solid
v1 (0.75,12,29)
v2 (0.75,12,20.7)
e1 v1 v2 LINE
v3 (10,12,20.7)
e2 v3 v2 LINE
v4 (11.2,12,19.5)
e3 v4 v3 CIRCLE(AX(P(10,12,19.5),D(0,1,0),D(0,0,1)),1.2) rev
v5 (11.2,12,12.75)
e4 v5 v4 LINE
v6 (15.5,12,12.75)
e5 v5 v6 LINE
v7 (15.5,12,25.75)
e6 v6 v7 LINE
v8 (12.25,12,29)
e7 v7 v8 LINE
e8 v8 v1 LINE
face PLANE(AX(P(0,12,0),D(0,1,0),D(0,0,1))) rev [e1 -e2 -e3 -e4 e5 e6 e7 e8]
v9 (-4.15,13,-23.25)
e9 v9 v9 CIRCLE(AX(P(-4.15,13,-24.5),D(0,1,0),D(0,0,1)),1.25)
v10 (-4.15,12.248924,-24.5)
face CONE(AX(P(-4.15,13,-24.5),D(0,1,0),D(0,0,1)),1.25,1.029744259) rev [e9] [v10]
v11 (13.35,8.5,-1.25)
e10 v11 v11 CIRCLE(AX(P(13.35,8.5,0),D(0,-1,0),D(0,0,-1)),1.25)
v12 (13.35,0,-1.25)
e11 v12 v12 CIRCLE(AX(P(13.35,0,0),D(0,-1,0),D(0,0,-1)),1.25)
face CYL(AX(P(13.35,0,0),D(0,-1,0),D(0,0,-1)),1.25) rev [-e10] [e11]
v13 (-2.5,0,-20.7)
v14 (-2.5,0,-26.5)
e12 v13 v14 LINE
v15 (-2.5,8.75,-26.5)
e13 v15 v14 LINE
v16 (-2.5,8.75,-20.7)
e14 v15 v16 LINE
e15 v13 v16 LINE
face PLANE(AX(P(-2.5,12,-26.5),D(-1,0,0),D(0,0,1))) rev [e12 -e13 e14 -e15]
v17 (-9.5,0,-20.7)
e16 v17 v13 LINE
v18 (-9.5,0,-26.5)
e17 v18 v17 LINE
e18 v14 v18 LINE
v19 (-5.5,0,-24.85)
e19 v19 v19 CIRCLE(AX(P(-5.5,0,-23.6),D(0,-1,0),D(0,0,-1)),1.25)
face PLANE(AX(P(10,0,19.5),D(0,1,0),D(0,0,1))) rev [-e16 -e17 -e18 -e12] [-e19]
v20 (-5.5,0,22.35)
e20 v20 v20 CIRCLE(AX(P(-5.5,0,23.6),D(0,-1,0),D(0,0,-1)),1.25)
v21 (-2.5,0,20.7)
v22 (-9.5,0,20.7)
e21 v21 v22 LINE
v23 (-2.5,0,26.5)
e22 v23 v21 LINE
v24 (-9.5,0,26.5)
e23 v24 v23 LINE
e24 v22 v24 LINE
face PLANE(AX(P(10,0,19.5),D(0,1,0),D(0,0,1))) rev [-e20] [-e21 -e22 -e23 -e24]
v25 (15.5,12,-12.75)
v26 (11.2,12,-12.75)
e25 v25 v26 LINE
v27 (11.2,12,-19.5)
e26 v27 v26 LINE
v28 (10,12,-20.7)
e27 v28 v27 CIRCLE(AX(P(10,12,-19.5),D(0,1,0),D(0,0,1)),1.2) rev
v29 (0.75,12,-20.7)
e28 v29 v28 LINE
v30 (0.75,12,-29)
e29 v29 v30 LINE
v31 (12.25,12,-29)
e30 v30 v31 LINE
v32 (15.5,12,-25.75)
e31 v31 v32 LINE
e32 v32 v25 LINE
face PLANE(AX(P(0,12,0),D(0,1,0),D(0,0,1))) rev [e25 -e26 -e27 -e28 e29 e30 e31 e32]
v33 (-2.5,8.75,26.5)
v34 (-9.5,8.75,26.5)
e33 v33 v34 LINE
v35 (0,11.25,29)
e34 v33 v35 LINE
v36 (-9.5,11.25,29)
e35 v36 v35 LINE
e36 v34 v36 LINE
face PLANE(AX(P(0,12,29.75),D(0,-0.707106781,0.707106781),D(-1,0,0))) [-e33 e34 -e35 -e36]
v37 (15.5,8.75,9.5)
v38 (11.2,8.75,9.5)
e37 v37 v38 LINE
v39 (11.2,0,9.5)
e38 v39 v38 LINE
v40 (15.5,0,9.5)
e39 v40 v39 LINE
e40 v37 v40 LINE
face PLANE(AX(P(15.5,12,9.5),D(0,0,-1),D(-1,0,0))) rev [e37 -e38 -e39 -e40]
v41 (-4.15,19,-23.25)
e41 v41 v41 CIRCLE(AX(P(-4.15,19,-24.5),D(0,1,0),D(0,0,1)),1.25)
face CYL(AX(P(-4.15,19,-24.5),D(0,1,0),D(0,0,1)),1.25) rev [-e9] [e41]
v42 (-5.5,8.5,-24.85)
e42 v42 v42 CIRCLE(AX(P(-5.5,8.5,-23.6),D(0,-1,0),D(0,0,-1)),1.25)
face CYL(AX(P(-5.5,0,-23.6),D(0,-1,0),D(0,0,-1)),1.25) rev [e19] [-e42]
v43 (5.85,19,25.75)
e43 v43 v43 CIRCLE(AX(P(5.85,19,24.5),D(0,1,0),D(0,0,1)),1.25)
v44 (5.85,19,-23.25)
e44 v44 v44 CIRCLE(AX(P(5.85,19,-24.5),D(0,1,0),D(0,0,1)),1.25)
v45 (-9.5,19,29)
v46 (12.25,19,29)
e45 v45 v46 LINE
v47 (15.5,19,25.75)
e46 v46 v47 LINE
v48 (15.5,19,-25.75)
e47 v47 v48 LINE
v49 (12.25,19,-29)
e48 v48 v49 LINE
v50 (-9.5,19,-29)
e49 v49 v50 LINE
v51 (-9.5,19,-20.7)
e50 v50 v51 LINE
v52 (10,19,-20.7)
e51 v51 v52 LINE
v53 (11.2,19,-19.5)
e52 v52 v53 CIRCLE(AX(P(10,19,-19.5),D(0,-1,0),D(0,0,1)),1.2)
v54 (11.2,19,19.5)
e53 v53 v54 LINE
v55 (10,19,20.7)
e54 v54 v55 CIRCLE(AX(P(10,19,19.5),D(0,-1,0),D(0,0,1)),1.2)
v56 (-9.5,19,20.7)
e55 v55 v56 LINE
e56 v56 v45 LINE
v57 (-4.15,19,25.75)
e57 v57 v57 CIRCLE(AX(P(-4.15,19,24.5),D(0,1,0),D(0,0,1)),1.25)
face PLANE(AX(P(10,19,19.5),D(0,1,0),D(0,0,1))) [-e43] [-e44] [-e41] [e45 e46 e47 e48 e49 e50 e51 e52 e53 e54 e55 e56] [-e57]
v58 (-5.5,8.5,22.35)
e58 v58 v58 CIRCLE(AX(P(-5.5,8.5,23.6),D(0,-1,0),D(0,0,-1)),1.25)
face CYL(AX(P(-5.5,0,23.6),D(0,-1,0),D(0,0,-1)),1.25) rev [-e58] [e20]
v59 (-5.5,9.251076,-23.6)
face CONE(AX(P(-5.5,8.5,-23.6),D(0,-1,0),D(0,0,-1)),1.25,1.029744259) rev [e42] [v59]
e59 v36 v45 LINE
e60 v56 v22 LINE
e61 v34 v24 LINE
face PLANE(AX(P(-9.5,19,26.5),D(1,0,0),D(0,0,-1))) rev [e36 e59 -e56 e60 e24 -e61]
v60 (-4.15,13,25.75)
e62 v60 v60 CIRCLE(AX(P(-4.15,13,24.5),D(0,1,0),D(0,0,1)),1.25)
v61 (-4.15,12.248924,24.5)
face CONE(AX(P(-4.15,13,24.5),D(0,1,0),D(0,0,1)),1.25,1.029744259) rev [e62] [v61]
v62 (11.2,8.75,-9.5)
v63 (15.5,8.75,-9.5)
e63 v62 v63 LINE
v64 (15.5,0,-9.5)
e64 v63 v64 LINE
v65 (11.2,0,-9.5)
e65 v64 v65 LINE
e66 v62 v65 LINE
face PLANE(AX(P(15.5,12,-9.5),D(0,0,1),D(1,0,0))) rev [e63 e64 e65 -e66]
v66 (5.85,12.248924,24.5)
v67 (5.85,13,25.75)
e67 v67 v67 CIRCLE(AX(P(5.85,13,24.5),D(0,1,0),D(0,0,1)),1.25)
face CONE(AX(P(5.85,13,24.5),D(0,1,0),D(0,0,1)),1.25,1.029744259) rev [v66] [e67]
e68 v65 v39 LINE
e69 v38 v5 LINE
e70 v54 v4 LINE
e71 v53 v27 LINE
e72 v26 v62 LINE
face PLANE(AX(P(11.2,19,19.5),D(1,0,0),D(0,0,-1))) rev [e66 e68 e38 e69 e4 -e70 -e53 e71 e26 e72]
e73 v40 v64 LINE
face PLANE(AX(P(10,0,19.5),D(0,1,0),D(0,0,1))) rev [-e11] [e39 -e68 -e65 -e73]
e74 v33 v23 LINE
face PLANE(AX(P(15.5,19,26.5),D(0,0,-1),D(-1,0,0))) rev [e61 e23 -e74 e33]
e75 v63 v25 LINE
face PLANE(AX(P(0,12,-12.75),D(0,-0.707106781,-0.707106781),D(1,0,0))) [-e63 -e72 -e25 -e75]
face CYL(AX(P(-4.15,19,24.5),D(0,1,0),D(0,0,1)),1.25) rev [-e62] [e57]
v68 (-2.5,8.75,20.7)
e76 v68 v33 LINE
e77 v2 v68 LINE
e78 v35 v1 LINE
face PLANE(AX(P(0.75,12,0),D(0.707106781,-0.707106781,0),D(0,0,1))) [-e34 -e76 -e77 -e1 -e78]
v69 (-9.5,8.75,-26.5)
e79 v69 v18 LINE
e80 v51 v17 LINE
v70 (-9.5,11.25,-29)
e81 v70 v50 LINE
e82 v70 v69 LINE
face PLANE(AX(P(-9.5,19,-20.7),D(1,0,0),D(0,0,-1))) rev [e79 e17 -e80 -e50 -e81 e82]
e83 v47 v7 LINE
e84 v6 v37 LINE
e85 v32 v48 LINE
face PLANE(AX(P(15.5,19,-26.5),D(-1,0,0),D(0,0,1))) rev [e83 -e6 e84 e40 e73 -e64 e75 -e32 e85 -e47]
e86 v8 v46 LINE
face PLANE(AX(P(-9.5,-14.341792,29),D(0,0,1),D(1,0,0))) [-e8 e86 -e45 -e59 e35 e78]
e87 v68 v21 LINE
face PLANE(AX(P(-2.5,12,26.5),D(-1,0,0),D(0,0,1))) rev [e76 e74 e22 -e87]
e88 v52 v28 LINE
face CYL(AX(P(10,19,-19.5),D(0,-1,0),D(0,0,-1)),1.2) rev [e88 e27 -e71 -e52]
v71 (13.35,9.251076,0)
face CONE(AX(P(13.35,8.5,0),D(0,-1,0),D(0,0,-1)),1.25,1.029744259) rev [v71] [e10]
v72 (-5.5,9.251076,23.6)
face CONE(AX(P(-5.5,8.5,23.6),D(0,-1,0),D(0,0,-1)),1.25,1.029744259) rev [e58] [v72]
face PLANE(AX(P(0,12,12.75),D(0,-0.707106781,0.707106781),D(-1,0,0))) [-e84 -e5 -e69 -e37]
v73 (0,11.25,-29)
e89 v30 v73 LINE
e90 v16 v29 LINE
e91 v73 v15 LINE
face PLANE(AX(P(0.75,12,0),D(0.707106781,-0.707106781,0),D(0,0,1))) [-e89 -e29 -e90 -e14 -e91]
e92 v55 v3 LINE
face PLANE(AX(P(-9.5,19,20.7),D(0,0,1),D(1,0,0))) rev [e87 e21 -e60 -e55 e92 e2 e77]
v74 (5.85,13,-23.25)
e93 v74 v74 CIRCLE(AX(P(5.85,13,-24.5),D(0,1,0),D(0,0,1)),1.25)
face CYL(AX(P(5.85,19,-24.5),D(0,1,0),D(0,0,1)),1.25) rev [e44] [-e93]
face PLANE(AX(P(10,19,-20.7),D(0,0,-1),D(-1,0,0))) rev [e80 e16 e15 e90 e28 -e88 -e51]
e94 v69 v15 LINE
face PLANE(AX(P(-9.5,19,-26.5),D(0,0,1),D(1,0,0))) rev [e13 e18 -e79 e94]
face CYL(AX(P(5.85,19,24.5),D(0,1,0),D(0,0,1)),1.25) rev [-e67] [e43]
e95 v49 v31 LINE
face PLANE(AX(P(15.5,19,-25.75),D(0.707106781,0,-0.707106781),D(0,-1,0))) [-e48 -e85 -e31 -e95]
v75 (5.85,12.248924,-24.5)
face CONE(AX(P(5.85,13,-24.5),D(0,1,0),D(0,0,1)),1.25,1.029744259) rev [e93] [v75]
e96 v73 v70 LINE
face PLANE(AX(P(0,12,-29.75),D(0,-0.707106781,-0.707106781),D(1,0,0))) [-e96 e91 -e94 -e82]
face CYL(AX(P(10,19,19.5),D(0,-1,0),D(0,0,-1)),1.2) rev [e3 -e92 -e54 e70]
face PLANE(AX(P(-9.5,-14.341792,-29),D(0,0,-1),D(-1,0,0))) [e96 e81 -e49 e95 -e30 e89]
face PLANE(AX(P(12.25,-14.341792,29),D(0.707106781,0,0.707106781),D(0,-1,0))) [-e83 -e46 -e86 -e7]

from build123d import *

# Parameters (mm, degrees)
BOSS_EXTRU_1_DEPTH      = 19
ESQUISSE2_W             = 18
ESQUISSE2_H             = 17
ENL_V_MAT_EXTRU_1_DEPTH = 12
TROU_TARAUD_M31_D       = 2.5
TROU_TARAUD_M31_DEPTH   = 8.5
TROU_TARAUD_M31_TIP     = 0.751075774
ESQUISSE7_W             = 25
ESQUISSE7_H             = 8.3
BOSS_EXTRU_2_DEPTH      = 7
CHANFREIN3_SIZE         = 3.25
TROU_TARAUD_M32_D       = 2.5
TROU_TARAUD_M32_DEPTH   = 6
TROU_TARAUD_M32_TIP     = 0.751075774


with BuildPart() as part:
    # Esquisse1 → Boss.-Extru.1 (new body)
    with BuildSketch(Plane(origin=(0, 0, 0), x_dir=(1, 0, 0), z_dir=(0, 1, 0))):
        with BuildLine():
            Line((-9.5, 20.7), (-9.5, 26.5))
            Line((-9.5, 26.5), (15.5, 26.5))
            Line((15.5, 26.5), (15.5, -26.5))
            Line((15.5, -26.5), (-9.5, -26.5))
            Line((-9.5, -26.5), (-9.5, -20.7))
            Line((-9.5, -20.7), (10, -20.7))
            ThreePointArc((10, -20.7), (10.848528137, -20.348528137), (11.2, -19.5))
            Line((11.2, -19.5), (11.2, 19.5))
            ThreePointArc((11.2, 19.5), (10.848528137, 20.348528137), (10, 20.7))
            Line((10, 20.7), (-9.5, 20.7))
        make_face()
    extrude(amount=BOSS_EXTRU_1_DEPTH)

    # Esquisse2 → Enlèv. mat.-Extru.1 (cut)
    with BuildSketch(Plane.XZ):
        with Locations((6.5, 18)):
            Rectangle(ESQUISSE2_W, ESQUISSE2_H)
        with Locations((6.5, -18)):
            Rectangle(ESQUISSE2_W, ESQUISSE2_H)
    extrude(amount=-ENL_V_MAT_EXTRU_1_DEPTH, mode=Mode.SUBTRACT)

    # Trou taraudé M31
    with Locations(Plane(origin=(0, 0, 0), x_dir=(-1, 0, 0), z_dir=(0, -1, 0))):
        with Locations((5.5, 23.6), (-13.35, 0), (5.5, -23.6)):
            Hole(TROU_TARAUD_M31_D / 2, depth=TROU_TARAUD_M31_DEPTH)
            with Locations((0, 0, -(TROU_TARAUD_M31_DEPTH + TROU_TARAUD_M31_TIP / 2))):  # 118° drill point
                Cone(0, TROU_TARAUD_M31_D / 2, TROU_TARAUD_M31_TIP, mode=Mode.SUBTRACT)

    # Esquisse7 → Boss.-Extru.2 (add)
    with BuildSketch(Plane(origin=(0, 19, 0), x_dir=(1, 0, 0), z_dir=(0, 1, 0))):
        with Locations((3, -24.85)):
            Rectangle(ESQUISSE7_W, ESQUISSE7_H)
        with Locations((3, 24.85)):
            Rectangle(ESQUISSE7_W, ESQUISSE7_H)
    extrude(amount=-BOSS_EXTRU_2_DEPTH)

    # Chanfrein3
    # the kernel refuses this chamfer: 3.25 mm, written as the material it adds along each edge
    with BuildSketch(Plane(origin=(11.2, 12, -9.5), x_dir=(0, 0.027495876610586424, -0.9996219169112968), z_dir=(1, 0, 0)), Plane(origin=(11.2, 12, 9.5), x_dir=(0, -0.9996219169112968, -0.027495876610586424), z_dir=(1, 0, 0))) as chanfrein3_piece_1:
        Polygon((CHANFREIN3_SIZE * 0.999621916911, -CHANFREIN3_SIZE * 0.0274958766106), (-CHANFREIN3_SIZE * 0.0274958766106, -CHANFREIN3_SIZE * 0.999621916911), (0, 0), align=None)
    extrude(amount=4.3)
    with BuildSketch(Plane(origin=(-9.5, 12, -26.5), x_dir=(0, -0.9996219169112968, 0.027495876610586424), z_dir=(1, 0, 0))) as chanfrein3_piece_2_section:
        Polygon((CHANFREIN3_SIZE * 0.999621916911, CHANFREIN3_SIZE * 0.0274958766106), (-CHANFREIN3_SIZE * 0.0274958766106, CHANFREIN3_SIZE * 0.999621916911), (0, 0), align=None)
    chanfrein3_piece_2 = extrude(amount=7, mode=Mode.PRIVATE)
    chanfrein3_piece_2 = split(chanfrein3_piece_2, bisect_by=Plane(origin=(-6, 10.864243408, -29), z_dir=(0, 0, 1)), keep=Keep.TOP, mode=Mode.PRIVATE)
    add(chanfrein3_piece_2)
    with BuildSketch(Plane(origin=(-2.5, 12, -26.5), x_dir=(-0.027495876610586424, -0.9996219169112968, 0), z_dir=(0, 0, 1)), Plane(origin=(-2.5, 12, 26.5), x_dir=(0.9996219169112966, 0.027495876610586428, 0), z_dir=(0, 0, -1))) as chanfrein3_piece_3:
        Polygon((CHANFREIN3_SIZE * 0.999621916911, CHANFREIN3_SIZE * 0.0274958766106), (-CHANFREIN3_SIZE * 0.0274958766106, CHANFREIN3_SIZE * 0.999621916911), (0, 0), align=None)
    extrude(amount=5.8)
    with BuildSketch(Plane(origin=(-9.5, 12, 26.5), x_dir=(0, 0.027495876610586424, 0.9996219169112968), z_dir=(1, 0, 0))) as chanfrein3_piece_4_section:
        Polygon((CHANFREIN3_SIZE * 0.999621916911, CHANFREIN3_SIZE * 0.0274958766106), (-CHANFREIN3_SIZE * 0.0274958766106, CHANFREIN3_SIZE * 0.999621916911), (0, 0), align=None)
    chanfrein3_piece_4 = extrude(amount=7, mode=Mode.PRIVATE)
    chanfrein3_piece_4 = split(chanfrein3_piece_4, bisect_by=Plane(origin=(-6, 10.864243408, 29), z_dir=(0, 0, -1)), keep=Keep.TOP, mode=Mode.PRIVATE)
    add(chanfrein3_piece_4)
    with BuildSketch(Plane(origin=(-9.5, 12, -26.5), x_dir=(0, -0.9996219169112968, 0.027495876610586424), z_dir=(1, 0, 0))) as chanfrein3_piece_5a_section:
        Polygon((CHANFREIN3_SIZE * 0.999621916911, CHANFREIN3_SIZE * 0.0274958766106), (-CHANFREIN3_SIZE * 0.0274958766106, CHANFREIN3_SIZE * 0.999621916911), (0, 0), align=None)
    chanfrein3_piece_5a = extrude(amount=15.357969711, mode=Mode.PRIVATE)
    chanfrein3_piece_5a = split(chanfrein3_piece_5a, bisect_by=Plane(origin=(-2.5, 10.864243408, -27.44984941), z_dir=(1, 0, 0)), keep=Keep.TOP, mode=Mode.PRIVATE)
    chanfrein3_piece_5a = split(chanfrein3_piece_5a, bisect_by=Plane(origin=(1.678984855, 10.864243408, -29), z_dir=(0, 0, 1)), keep=Keep.TOP, mode=Mode.PRIVATE)
    with BuildSketch(Plane(origin=(-2.5, 12, -34.857969711), x_dir=(-0.027495876610586424, -0.9996219169112968, 0), z_dir=(0, 0, 1))) as chanfrein3_piece_5b_section:
        Polygon((CHANFREIN3_SIZE * 0.999621916911, CHANFREIN3_SIZE * 0.0274958766106), (-CHANFREIN3_SIZE * 0.0274958766106, CHANFREIN3_SIZE * 0.999621916911), (0, 0), align=None)
    chanfrein3_piece_5b = extrude(amount=14.157969711, mode=Mode.PRIVATE)
    chanfrein3_piece_5b = split(chanfrein3_piece_5b, bisect_by=Plane(origin=(-1.428170713, 10.928170713, -26.5), z_dir=(0, 0, -1)), keep=Keep.TOP, mode=Mode.PRIVATE)
    chanfrein3_piece_5b = split(chanfrein3_piece_5b, bisect_by=Plane(origin=(-1.428170713, 10.928170713, -29), z_dir=(0, 0, 1)), keep=Keep.TOP, mode=Mode.PRIVATE)
    chanfrein3_piece_5 = chanfrein3_piece_5a & chanfrein3_piece_5b
    add(chanfrein3_piece_5)
    with BuildSketch(Plane(origin=(-9.5, 12, 26.5), x_dir=(0, 0.027495876610586424, 0.9996219169112968), z_dir=(1, 0, 0))) as chanfrein3_piece_6a_section:
        Polygon((CHANFREIN3_SIZE * 0.999621916911, CHANFREIN3_SIZE * 0.0274958766106), (-CHANFREIN3_SIZE * 0.0274958766106, CHANFREIN3_SIZE * 0.999621916911), (0, 0), align=None)
    chanfrein3_piece_6a = extrude(amount=15.357969711, mode=Mode.PRIVATE)
    chanfrein3_piece_6a = split(chanfrein3_piece_6a, bisect_by=Plane(origin=(1.678984855, 10.864243408, 29), z_dir=(0, 0, -1)), keep=Keep.TOP, mode=Mode.PRIVATE)
    chanfrein3_piece_6a = split(chanfrein3_piece_6a, bisect_by=Plane(origin=(-2.5, 10.864243408, 27.44984941), z_dir=(1, 0, 0)), keep=Keep.TOP, mode=Mode.PRIVATE)
    with BuildSketch(Plane(origin=(-2.5, 12, 34.857969711), x_dir=(0.9996219169112968, 0.027495876610586424, 0), z_dir=(0, 0, -1))) as chanfrein3_piece_6b_section:
        Polygon((CHANFREIN3_SIZE * 0.999621916911, CHANFREIN3_SIZE * 0.0274958766106), (-CHANFREIN3_SIZE * 0.0274958766106, CHANFREIN3_SIZE * 0.999621916911), (0, 0), align=None)
    chanfrein3_piece_6b = extrude(amount=14.157969711, mode=Mode.PRIVATE)
    chanfrein3_piece_6b = split(chanfrein3_piece_6b, bisect_by=Plane(origin=(-1.428170713, 10.928170713, 29), z_dir=(0, 0, -1)), keep=Keep.TOP, mode=Mode.PRIVATE)
    chanfrein3_piece_6b = split(chanfrein3_piece_6b, bisect_by=Plane(origin=(-1.428170713, 10.928170713, 26.5), z_dir=(0, 0, 1)), keep=Keep.TOP, mode=Mode.PRIVATE)
    chanfrein3_piece_6 = chanfrein3_piece_6a & chanfrein3_piece_6b
    add(chanfrein3_piece_6)
    # the kernel refuses this chamfer: 3.25 mm, written as the material it takes off along each edge
    with BuildSketch(Plane(origin=(15.5, 27.357969711, 29), x_dir=(0.027495876610586424, 0, -0.9996219169112968), z_dir=(0, -1, 0))) as chanfrein3_2_piece_1:
        Polygon((CHANFREIN3_SIZE * 0.999621916911, -CHANFREIN3_SIZE * 0.0274958766106), (-CHANFREIN3_SIZE * 0.0274958766106, -CHANFREIN3_SIZE * 0.999621916911), (0, 0), align=None)
    extrude(amount=23.715939422, mode=Mode.SUBTRACT)
    with BuildSketch(Plane(origin=(15.5, 27.357969711, -29), x_dir=(0.027495876610586424, 0, 0.9996219169112968), z_dir=(0, -1, 0))) as chanfrein3_2_piece_2:
        Polygon((CHANFREIN3_SIZE * 0.999621916911, CHANFREIN3_SIZE * 0.0274958766106), (-CHANFREIN3_SIZE * 0.0274958766106, CHANFREIN3_SIZE * 0.999621916911), (0, 0), align=None)
    extrude(amount=23.715939422, mode=Mode.SUBTRACT)

    # Trou taraudé M32
    with Locations(Plane(origin=(0, 19, 0), x_dir=(1, 0, 0), z_dir=(0, 1, 0))):
        with Locations((-4.15, 24.5), (-4.15, -24.5), (5.85, -24.5), (5.85, 24.5)):
            Hole(TROU_TARAUD_M32_D / 2, depth=TROU_TARAUD_M32_DEPTH)
            with Locations((0, 0, -(TROU_TARAUD_M32_DEPTH + TROU_TARAUD_M32_TIP / 2))):  # 118° drill point
                Cone(0, TROU_TARAUD_M32_D / 2, TROU_TARAUD_M32_TIP, mode=Mode.SUBTRACT)


solid = part.part
